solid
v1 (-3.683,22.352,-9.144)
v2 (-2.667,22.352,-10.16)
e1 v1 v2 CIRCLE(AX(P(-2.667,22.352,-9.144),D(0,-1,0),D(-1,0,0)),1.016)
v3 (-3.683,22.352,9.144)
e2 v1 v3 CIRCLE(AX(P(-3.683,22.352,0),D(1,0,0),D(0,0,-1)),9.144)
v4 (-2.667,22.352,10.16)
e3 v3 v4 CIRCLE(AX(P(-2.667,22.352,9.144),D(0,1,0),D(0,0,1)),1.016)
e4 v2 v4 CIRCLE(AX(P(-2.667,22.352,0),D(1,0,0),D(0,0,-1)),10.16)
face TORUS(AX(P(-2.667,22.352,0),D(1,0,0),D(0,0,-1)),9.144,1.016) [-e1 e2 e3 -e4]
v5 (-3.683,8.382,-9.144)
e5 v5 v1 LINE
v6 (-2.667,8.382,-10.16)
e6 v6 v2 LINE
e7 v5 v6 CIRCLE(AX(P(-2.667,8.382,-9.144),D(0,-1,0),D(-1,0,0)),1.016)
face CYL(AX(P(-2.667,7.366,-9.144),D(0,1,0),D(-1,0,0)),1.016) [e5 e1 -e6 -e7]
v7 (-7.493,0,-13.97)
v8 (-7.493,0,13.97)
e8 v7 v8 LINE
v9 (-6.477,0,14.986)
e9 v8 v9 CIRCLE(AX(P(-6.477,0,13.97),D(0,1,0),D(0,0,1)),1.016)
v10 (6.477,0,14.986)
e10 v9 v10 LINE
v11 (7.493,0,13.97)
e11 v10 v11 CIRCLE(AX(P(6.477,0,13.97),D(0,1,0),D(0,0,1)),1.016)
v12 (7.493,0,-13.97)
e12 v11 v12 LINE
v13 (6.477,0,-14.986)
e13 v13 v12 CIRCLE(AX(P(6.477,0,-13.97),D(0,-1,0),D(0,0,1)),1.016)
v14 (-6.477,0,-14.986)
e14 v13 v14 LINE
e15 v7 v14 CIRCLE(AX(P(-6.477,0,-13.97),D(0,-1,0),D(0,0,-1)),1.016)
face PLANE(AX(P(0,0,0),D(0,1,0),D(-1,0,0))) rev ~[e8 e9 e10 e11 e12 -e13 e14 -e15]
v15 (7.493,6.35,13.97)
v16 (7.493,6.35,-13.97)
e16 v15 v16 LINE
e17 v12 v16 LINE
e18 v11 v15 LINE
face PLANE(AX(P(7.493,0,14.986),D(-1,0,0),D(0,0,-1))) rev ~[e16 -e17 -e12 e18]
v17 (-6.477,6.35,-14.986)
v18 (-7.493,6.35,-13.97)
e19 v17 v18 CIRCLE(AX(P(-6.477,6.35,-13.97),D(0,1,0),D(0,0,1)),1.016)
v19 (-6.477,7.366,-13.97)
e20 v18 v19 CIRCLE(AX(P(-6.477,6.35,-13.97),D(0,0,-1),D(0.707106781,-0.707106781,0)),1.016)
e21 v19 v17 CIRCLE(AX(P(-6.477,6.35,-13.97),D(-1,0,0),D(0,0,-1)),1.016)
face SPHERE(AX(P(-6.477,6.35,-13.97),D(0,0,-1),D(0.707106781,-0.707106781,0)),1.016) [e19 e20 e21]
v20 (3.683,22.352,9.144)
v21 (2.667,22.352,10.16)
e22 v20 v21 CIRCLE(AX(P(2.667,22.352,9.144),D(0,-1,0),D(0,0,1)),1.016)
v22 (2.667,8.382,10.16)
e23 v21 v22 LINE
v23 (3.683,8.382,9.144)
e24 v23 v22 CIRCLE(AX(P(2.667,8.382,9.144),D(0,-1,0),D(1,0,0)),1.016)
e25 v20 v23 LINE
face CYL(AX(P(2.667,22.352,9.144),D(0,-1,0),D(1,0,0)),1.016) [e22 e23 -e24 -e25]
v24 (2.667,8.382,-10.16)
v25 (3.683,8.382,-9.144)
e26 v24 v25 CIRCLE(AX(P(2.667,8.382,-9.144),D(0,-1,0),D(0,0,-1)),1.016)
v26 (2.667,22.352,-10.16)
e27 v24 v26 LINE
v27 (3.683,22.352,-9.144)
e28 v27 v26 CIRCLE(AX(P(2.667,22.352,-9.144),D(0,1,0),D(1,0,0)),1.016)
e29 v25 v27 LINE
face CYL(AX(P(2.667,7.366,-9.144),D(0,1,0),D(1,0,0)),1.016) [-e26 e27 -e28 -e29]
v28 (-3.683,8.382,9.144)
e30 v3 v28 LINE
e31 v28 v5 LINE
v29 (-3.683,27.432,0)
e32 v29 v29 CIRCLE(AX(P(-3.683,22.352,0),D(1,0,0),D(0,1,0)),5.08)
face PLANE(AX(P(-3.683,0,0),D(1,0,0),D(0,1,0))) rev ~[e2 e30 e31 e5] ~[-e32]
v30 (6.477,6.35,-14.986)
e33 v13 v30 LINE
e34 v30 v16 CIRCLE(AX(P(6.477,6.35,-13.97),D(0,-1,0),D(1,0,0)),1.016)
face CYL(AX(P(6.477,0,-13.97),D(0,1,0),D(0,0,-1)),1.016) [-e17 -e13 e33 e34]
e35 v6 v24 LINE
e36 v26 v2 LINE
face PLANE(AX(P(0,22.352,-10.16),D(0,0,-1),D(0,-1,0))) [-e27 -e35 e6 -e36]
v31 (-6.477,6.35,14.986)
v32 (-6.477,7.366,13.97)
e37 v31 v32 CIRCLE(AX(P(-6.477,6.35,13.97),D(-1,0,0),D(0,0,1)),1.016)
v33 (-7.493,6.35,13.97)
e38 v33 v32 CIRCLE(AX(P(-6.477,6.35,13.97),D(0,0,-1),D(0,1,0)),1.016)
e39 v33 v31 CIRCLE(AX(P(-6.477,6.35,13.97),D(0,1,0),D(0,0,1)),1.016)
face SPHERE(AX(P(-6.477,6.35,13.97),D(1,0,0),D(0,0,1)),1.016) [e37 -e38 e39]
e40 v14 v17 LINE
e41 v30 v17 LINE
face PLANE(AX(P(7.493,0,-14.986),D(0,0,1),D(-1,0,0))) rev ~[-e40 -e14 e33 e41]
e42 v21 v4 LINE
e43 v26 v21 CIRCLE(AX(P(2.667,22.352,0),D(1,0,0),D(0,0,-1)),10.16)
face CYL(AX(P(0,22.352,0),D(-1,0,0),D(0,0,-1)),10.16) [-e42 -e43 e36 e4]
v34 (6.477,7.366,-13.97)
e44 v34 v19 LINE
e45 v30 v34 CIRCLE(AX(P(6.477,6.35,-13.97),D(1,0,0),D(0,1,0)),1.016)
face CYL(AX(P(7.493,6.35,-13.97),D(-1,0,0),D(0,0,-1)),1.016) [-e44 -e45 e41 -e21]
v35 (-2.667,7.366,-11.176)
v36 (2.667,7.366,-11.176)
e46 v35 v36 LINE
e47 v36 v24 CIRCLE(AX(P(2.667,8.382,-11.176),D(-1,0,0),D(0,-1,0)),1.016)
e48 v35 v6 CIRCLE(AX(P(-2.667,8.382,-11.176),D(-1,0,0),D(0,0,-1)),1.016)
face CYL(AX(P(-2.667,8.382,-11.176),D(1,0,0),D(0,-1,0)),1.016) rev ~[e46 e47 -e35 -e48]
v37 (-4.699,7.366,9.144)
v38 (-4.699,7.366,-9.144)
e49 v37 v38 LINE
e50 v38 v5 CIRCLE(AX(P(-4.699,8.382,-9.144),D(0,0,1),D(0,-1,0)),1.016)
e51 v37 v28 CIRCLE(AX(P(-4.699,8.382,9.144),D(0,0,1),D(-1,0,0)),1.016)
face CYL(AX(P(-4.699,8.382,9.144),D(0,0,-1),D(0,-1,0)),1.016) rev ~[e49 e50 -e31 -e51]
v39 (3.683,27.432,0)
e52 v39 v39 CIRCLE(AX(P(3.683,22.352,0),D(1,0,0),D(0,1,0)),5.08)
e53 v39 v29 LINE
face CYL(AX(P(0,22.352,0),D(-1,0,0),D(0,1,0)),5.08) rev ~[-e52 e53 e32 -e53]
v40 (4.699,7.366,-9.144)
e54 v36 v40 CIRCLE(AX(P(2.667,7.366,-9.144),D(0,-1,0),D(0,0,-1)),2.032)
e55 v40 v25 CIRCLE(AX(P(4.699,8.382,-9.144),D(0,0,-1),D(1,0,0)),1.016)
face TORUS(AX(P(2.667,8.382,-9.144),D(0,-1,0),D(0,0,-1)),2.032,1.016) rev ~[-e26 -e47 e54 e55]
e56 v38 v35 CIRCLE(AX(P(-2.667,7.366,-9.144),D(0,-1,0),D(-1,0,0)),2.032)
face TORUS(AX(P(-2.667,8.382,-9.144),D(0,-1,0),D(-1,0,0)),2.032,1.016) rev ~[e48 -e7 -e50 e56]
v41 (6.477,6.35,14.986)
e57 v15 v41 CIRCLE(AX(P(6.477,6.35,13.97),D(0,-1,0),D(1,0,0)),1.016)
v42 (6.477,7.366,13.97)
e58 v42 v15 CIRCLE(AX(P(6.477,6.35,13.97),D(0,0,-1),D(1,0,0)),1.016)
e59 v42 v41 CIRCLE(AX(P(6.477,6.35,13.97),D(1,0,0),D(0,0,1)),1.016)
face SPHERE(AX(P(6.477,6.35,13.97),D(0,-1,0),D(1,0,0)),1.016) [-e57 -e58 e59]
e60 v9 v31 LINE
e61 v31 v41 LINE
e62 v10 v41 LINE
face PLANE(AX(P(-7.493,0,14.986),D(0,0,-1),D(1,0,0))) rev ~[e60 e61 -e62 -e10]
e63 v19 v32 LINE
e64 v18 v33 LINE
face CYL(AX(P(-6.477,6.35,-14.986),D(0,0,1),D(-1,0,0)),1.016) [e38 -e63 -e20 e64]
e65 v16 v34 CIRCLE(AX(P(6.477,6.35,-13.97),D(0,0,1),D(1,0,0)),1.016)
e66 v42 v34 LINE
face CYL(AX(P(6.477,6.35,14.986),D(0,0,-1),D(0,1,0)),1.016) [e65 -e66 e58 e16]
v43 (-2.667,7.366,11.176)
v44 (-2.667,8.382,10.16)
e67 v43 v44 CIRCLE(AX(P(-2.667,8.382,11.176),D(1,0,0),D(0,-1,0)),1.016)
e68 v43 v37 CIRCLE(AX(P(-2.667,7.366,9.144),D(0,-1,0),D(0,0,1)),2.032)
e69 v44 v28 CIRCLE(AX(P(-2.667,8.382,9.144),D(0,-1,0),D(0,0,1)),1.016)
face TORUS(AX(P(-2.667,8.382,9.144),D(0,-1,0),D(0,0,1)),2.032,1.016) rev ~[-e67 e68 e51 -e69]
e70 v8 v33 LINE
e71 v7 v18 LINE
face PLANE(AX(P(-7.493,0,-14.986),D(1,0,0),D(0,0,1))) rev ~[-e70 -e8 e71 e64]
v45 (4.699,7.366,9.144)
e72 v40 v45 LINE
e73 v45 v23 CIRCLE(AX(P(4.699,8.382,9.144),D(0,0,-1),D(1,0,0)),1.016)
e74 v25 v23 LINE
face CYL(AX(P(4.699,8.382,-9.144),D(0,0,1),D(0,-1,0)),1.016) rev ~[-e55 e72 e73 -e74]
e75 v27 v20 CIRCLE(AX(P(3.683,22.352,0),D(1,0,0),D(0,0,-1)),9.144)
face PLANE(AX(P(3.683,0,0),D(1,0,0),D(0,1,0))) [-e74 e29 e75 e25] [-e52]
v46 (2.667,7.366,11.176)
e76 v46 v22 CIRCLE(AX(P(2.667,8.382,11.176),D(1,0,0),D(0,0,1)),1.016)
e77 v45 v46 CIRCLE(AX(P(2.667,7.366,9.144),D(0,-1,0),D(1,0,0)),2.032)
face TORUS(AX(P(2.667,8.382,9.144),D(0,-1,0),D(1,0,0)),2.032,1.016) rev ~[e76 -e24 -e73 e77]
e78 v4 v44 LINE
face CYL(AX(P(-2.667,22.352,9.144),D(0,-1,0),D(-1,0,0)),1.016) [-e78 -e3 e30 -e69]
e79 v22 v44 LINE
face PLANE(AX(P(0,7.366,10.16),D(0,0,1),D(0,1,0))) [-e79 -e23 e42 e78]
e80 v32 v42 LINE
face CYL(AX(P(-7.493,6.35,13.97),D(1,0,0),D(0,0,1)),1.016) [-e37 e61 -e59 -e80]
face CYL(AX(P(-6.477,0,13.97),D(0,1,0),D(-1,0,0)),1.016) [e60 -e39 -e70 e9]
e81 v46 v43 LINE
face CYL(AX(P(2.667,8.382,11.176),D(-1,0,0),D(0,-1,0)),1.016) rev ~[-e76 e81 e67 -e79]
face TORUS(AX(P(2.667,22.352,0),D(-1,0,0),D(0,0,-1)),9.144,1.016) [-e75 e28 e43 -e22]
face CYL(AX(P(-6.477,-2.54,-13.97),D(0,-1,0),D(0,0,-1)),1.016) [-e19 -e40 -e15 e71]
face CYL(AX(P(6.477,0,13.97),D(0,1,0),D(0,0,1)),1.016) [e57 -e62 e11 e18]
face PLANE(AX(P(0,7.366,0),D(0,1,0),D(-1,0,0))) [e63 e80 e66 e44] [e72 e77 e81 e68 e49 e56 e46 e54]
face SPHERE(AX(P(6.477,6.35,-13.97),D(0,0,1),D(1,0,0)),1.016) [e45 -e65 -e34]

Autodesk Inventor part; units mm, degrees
ref_plane "YZ Plane" through (0, 0, 0) normal (1, 0, 0) x (0, 1, 0)
ref_plane "XZ Plane" through (0, 0, 0) normal (0, 1, 0) x (-1, 0, 0)
ref_plane "XY Plane" through (0, 0, 0) normal (0, 0, 1) x (1, 0, 0)
sketch "Sketch1" plane through (0, 0, 0) normal (0, 1, 0) x (-1, 0, 0)
  line L0 (7.493, 14.986) -> (-7.493, 14.986)
  line L1 (-7.493, 14.986) -> (-7.493, -14.986)
  line L2 (-7.493, -14.986) -> (7.493, -14.986)
  line L3 (7.493, -14.986) -> (7.493, 14.986)
  line L4 (7.493, 14.986) -> (-7.493, -14.986) construction
  line L5 (-7.493, 14.986) -> (7.493, -14.986) construction
  point P0 (0, 0)
  dimension "d0" = 29.972
  dimension "d1" = 14.986
extrude "Extrusion1" add sketch "Sketch1" along normal blind 7.366
sketch "Sketch2" plane through (0, 0, 0) normal (1, 0, 0) x (0, 1, 0)
  line L0 (7.366, 14.986) -> (7.366, -14.986) projected
  line L1 (7.366, 10.16) -> (22.352, 10.16)
  arc A0 (22.352, -10.16) -> (22.352, 10.16) centre (22.352, 0) ccw
  line L2 (22.352, -10.16) -> (7.366, -10.16)
  line L3 (7.366, 10.16) -> (7.366, -10.16)
  circle A1 centre (22.352, 0) radius 5.08
  point P0 (0, 0)
  dimension "d4" = 14.986
  dimension "d5" = 10.16
  dimension "d6" = 10.16
  dimension "d7" = 10.16
extrude "Extrusion2" add sketch "Sketch2" along normal mid plane 7.366
fillet "Fillet1" radius 1.016 7 edges at (7.493, 3.683, 14.986) (7.493, 7.366, 0) (7.493, 3.683, -14.986) (0, 7.366, -14.986) (0, 7.366, 14.986) (-7.493, 3.683, 14.986) (-7.493, 7.366, 0)
fillet "Fillet2" radius 1.016 6 edges at (3.683, 32.512, 0) (3.683, 14.859, -10.16) (3.683, 14.859, 10.16) (-3.683, 32.512, 0) (-3.683, 14.859, -10.16) (-3.683, 14.859, 10.16)
fillet "Fillet3" radius 1.016 8 edges at (3.3854, 7.366, 9.8624) (0, 7.366, 10.16) (-3.3854, 7.366, 9.8624) (-3.683, 7.366, 0) (-3.3854, 7.366, -9.8624) (0, 7.366, -10.16) (3.3854, 7.366, -9.8624) (3.683, 7.366, 0)
fillet "Fillet4" radius 1.016 2 edges at (-7.1954, 7.0684, -14.6884) (-7.493, 3.175, -14.986)
properties part number "Pivot"
